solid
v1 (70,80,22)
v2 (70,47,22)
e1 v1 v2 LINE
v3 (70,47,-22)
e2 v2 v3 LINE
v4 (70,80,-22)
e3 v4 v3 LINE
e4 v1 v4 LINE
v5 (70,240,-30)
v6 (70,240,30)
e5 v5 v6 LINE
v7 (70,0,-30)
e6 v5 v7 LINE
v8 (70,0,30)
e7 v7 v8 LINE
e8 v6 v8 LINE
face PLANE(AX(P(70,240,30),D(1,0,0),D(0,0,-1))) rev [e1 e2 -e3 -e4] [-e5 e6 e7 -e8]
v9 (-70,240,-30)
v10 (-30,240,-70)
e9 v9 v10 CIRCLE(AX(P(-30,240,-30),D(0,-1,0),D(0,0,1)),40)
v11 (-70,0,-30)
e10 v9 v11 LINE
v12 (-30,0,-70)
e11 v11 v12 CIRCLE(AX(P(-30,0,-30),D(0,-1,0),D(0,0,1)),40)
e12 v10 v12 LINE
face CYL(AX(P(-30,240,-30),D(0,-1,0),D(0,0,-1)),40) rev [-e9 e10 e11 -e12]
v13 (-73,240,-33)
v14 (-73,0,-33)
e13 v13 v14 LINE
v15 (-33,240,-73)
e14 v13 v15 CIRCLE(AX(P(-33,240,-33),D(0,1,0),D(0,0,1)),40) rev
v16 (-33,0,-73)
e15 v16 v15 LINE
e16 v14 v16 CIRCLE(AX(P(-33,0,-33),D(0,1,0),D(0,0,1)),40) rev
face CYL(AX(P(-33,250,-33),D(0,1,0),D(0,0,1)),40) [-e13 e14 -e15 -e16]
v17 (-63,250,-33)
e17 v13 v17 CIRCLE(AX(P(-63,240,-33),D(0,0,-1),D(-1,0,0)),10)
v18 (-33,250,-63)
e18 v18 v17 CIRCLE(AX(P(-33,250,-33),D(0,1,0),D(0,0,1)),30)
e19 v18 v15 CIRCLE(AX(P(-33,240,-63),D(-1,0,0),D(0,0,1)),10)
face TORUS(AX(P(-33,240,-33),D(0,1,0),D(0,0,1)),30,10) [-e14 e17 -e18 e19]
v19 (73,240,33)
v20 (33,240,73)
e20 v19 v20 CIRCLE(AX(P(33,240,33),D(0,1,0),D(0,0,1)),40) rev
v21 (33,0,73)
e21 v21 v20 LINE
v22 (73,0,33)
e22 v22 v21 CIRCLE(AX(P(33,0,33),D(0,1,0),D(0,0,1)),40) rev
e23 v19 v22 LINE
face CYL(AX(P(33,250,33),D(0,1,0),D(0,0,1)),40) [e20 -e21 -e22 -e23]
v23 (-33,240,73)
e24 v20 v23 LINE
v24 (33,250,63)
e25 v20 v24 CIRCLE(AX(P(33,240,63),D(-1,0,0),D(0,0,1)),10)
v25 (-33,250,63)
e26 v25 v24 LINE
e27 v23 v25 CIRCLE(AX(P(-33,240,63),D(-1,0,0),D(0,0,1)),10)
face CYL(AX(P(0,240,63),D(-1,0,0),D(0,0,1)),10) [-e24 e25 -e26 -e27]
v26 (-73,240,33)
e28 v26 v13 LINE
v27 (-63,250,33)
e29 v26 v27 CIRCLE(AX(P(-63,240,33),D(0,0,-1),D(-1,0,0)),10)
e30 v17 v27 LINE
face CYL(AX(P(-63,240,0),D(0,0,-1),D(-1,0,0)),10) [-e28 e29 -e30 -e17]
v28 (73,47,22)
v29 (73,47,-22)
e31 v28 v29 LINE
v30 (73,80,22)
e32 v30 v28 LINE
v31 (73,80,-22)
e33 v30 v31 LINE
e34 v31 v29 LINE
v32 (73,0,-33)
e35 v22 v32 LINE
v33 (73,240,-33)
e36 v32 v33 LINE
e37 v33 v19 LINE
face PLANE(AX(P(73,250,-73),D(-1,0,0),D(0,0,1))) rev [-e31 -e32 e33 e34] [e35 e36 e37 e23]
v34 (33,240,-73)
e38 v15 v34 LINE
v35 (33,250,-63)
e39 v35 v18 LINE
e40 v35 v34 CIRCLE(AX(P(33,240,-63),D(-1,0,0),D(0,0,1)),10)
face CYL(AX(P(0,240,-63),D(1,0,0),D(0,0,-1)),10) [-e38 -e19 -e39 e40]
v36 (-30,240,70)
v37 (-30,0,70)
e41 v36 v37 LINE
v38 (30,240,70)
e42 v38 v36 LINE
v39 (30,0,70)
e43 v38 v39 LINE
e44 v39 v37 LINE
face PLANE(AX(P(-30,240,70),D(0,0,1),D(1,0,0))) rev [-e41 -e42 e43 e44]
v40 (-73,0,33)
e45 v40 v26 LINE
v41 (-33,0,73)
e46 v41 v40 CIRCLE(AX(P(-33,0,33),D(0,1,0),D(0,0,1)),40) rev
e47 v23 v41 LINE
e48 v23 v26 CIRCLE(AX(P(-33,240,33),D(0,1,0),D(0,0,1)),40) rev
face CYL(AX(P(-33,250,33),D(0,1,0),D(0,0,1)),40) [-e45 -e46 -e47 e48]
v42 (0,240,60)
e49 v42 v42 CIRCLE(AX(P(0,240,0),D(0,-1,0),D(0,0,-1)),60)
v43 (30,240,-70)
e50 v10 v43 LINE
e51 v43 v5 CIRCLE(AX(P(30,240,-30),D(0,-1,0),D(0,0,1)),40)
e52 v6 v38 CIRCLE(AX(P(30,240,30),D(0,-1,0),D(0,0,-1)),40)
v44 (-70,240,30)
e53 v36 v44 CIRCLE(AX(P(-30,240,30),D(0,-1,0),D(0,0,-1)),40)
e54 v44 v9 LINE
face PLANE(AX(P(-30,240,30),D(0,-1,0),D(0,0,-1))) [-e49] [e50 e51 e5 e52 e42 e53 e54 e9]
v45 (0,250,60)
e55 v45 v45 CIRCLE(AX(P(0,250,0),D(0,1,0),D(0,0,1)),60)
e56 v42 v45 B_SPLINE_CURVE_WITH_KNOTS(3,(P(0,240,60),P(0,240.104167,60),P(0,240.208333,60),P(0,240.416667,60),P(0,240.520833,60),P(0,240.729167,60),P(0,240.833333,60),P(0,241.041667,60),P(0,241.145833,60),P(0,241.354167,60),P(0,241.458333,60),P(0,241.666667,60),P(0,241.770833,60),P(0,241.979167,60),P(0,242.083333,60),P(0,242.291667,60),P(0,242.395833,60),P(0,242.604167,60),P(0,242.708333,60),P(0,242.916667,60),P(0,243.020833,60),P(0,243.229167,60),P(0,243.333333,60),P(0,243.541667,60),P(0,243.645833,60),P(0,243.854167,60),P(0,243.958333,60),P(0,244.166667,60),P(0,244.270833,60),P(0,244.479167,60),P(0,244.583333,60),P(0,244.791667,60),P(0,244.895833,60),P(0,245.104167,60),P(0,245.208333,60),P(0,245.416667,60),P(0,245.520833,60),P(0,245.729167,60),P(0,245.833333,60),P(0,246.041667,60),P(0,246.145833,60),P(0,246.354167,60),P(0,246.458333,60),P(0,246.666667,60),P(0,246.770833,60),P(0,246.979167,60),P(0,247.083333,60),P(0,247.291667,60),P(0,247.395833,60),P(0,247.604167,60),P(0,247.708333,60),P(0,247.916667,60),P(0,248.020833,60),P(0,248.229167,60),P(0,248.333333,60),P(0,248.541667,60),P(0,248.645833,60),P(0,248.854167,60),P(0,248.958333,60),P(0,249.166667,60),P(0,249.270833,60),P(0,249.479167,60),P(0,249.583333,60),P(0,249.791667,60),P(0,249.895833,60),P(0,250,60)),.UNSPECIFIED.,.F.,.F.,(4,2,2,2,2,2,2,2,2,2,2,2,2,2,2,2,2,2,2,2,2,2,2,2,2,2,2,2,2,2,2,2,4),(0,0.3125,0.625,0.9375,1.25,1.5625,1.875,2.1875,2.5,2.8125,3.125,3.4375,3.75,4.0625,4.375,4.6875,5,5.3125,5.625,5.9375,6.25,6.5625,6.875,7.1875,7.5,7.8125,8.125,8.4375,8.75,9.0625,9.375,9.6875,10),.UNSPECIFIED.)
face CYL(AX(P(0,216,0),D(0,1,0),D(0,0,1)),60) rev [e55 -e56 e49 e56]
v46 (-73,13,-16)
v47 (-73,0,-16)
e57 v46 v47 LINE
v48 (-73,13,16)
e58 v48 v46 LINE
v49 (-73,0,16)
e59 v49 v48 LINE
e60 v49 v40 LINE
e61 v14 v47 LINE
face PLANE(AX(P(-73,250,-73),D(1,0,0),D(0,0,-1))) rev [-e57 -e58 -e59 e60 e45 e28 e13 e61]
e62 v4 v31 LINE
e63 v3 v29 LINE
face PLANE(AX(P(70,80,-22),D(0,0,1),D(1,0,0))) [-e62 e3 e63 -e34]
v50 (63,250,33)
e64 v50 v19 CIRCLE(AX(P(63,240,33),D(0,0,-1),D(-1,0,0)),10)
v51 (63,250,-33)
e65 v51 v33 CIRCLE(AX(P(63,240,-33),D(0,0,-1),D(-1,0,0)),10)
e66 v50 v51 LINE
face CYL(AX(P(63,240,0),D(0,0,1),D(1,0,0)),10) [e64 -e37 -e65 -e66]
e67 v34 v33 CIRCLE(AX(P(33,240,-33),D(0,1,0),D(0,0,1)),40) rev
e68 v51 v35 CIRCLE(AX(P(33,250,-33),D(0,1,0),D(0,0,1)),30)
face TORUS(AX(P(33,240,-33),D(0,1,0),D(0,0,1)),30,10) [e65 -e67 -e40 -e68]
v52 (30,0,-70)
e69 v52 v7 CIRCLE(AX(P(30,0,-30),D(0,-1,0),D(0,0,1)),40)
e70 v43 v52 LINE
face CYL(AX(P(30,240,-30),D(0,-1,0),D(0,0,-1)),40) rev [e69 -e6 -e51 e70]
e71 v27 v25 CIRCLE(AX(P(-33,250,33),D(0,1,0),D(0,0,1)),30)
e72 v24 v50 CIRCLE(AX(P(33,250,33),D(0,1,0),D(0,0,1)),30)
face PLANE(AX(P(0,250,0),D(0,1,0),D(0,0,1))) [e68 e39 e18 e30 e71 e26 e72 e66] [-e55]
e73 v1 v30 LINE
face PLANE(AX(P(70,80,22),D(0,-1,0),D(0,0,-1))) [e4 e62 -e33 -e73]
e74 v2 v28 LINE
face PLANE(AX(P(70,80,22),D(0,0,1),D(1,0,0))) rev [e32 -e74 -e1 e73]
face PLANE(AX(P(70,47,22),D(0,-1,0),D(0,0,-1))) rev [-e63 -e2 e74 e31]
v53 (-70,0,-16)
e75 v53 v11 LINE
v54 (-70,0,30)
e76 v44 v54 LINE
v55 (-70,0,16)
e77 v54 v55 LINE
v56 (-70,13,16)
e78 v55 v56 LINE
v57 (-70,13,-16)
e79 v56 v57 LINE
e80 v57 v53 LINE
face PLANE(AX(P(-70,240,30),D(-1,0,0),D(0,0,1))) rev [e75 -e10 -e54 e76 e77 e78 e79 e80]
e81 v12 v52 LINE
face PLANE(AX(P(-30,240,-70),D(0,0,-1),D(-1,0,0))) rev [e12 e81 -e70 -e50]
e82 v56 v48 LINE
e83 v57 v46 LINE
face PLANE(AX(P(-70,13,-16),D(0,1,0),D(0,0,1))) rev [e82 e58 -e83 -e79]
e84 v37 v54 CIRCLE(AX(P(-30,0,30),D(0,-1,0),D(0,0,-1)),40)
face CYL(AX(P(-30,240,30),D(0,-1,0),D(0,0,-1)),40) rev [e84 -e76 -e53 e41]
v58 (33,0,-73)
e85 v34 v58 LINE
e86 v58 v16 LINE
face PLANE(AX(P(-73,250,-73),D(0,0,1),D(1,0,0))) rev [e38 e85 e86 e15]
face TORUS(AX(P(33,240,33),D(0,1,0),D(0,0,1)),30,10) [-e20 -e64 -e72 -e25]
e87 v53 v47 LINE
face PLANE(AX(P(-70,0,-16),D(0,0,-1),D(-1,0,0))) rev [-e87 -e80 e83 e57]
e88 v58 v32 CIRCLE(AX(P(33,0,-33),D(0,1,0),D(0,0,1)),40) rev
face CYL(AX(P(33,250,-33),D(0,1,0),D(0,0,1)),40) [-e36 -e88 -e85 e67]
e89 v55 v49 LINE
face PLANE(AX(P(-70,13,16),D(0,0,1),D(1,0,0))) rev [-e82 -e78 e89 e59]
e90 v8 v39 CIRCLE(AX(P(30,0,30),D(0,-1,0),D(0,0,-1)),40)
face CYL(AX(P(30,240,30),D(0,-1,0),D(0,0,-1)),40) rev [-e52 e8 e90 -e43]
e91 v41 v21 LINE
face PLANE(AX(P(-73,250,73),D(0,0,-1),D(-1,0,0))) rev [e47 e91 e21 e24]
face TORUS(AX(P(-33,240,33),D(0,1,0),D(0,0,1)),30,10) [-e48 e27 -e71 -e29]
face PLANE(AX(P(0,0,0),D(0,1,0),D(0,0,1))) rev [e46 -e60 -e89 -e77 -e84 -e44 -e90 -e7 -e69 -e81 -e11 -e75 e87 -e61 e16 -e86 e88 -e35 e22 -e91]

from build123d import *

# Parameters (mm, degrees)
SKETCH5_W           = 146
SKETCH5_H           = 146
BOSS_EXTRUDE2_DEPTH = 250
FILLET8_R           = 40
FILLET9_R           = 40
FILLET10_R          = 40
FILLET11_R          = 40
FILLET12_R          = 10
BOSS_EXTRUDE5_START = -240
BOSS_EXTRUDE5_DEPTH = 240
SKETCH8_R           = 60
CUT_EXTRUDE1_DEPTH  = 34
SKETCH10_W          = 44
SKETCH10_H          = 33
CUT_EXTRUDE2_DEPTH  = 3
CUT_EXTRUDE3_DEPTH  = 3


# Read off the part's stored shape, not the designer's step: Boss-Extrude5
with BuildPart() as part:
    # Sketch5 → Boss-Extrude2 (new body)
    with BuildSketch(Plane(origin=(0, 0, 0), x_dir=(1, 0, 0), z_dir=(0, 1, 0))):
        Rectangle(SKETCH5_W, SKETCH5_H)
    extrude(amount=BOSS_EXTRUDE2_DEPTH)

    # Fillet8
    fillet8_edges = [part.edges().sort_by_distance(p)[0] for p in [
        (73, 125, 73),
    ]]
    fillet(fillet8_edges, radius=FILLET8_R)

    # Fillet9
    fillet9_edges = [part.edges().sort_by_distance(p)[0] for p in [
        (73, 125, -73),
    ]]
    fillet(fillet9_edges, radius=FILLET9_R)

    # Fillet10
    fillet10_edges = [part.edges().sort_by_distance(p)[0] for p in [
        (-73, 125, -73),
    ]]
    fillet(fillet10_edges, radius=FILLET10_R)

    # Fillet11
    fillet11_edges = [part.edges().sort_by_distance(p)[0] for p in [
        (-73, 125, 73),
    ]]
    fillet(fillet11_edges, radius=FILLET11_R)

    # Fillet12
    fillet12_edges = [part.edges().sort_by_distance(p)[0] for p in [
        (73, 250, 0),
        (61.284271247, 250, 61.284271247),
        (0, 250, -73),
        (61.284271247, 250, -61.284271247),
        (-73, 250, 0),
        (-61.284271247, 250, -61.284271247),
        (0, 250, 73),
        (-61.284271247, 250, 61.284271247),
    ]]
    fillet(fillet12_edges, radius=FILLET12_R)

    # Boss-Extrude5 outline → Boss-Extrude5 (cut)
    with BuildSketch(Plane.XZ.offset(BOSS_EXTRUDE5_START)):
        with BuildLine():
            Line((30, 70), (-30, 70))
            ThreePointArc((-30, 70), (-58.284271247, 58.284271247), (-70, 30))
            Line((-70, 30), (-70, -30))
            ThreePointArc((-70, -30), (-58.284271247, -58.284271247), (-30, -70))
            Line((-30, -70), (30, -70))
            ThreePointArc((30, -70), (58.284271247, -58.284271247), (70, -30))
            Line((70, -30), (70, 30))
            ThreePointArc((70, 30), (58.284271247, 58.284271247), (30, 70))
        make_face()
    extrude(amount=BOSS_EXTRUDE5_DEPTH, mode=Mode.SUBTRACT)

    # Sketch8 → Cut-Extrude1 (cut)
    with BuildSketch(Plane(origin=(0, 250, 0), x_dir=(1, 0, 0), z_dir=(0, 1, 0))):
        with Locations(Location((0, 0, 0), (0, 0, 270))):
            Circle(SKETCH8_R)
    extrude(amount=-CUT_EXTRUDE1_DEPTH, mode=Mode.SUBTRACT)

    # Sketch10 → Cut-Extrude2 (cut)
    with BuildSketch(Plane(origin=(73, 0, 0), x_dir=(0, 0, -1), z_dir=(1, 0, 0))):
        with Locations((0, 63.5)):
            Rectangle(SKETCH10_W, SKETCH10_H)
    extrude(amount=-CUT_EXTRUDE2_DEPTH, mode=Mode.SUBTRACT)

    # Sketch11 → Cut-Extrude3 (cut)
    with BuildSketch(Plane.ZY.offset(73)):
        Polygon((0, 0), (-16, 0), (-16, 13), (16, 13), (16, 0), align=None)
    extrude(amount=-CUT_EXTRUDE3_DEPTH, mode=Mode.SUBTRACT)


solid = part.part
